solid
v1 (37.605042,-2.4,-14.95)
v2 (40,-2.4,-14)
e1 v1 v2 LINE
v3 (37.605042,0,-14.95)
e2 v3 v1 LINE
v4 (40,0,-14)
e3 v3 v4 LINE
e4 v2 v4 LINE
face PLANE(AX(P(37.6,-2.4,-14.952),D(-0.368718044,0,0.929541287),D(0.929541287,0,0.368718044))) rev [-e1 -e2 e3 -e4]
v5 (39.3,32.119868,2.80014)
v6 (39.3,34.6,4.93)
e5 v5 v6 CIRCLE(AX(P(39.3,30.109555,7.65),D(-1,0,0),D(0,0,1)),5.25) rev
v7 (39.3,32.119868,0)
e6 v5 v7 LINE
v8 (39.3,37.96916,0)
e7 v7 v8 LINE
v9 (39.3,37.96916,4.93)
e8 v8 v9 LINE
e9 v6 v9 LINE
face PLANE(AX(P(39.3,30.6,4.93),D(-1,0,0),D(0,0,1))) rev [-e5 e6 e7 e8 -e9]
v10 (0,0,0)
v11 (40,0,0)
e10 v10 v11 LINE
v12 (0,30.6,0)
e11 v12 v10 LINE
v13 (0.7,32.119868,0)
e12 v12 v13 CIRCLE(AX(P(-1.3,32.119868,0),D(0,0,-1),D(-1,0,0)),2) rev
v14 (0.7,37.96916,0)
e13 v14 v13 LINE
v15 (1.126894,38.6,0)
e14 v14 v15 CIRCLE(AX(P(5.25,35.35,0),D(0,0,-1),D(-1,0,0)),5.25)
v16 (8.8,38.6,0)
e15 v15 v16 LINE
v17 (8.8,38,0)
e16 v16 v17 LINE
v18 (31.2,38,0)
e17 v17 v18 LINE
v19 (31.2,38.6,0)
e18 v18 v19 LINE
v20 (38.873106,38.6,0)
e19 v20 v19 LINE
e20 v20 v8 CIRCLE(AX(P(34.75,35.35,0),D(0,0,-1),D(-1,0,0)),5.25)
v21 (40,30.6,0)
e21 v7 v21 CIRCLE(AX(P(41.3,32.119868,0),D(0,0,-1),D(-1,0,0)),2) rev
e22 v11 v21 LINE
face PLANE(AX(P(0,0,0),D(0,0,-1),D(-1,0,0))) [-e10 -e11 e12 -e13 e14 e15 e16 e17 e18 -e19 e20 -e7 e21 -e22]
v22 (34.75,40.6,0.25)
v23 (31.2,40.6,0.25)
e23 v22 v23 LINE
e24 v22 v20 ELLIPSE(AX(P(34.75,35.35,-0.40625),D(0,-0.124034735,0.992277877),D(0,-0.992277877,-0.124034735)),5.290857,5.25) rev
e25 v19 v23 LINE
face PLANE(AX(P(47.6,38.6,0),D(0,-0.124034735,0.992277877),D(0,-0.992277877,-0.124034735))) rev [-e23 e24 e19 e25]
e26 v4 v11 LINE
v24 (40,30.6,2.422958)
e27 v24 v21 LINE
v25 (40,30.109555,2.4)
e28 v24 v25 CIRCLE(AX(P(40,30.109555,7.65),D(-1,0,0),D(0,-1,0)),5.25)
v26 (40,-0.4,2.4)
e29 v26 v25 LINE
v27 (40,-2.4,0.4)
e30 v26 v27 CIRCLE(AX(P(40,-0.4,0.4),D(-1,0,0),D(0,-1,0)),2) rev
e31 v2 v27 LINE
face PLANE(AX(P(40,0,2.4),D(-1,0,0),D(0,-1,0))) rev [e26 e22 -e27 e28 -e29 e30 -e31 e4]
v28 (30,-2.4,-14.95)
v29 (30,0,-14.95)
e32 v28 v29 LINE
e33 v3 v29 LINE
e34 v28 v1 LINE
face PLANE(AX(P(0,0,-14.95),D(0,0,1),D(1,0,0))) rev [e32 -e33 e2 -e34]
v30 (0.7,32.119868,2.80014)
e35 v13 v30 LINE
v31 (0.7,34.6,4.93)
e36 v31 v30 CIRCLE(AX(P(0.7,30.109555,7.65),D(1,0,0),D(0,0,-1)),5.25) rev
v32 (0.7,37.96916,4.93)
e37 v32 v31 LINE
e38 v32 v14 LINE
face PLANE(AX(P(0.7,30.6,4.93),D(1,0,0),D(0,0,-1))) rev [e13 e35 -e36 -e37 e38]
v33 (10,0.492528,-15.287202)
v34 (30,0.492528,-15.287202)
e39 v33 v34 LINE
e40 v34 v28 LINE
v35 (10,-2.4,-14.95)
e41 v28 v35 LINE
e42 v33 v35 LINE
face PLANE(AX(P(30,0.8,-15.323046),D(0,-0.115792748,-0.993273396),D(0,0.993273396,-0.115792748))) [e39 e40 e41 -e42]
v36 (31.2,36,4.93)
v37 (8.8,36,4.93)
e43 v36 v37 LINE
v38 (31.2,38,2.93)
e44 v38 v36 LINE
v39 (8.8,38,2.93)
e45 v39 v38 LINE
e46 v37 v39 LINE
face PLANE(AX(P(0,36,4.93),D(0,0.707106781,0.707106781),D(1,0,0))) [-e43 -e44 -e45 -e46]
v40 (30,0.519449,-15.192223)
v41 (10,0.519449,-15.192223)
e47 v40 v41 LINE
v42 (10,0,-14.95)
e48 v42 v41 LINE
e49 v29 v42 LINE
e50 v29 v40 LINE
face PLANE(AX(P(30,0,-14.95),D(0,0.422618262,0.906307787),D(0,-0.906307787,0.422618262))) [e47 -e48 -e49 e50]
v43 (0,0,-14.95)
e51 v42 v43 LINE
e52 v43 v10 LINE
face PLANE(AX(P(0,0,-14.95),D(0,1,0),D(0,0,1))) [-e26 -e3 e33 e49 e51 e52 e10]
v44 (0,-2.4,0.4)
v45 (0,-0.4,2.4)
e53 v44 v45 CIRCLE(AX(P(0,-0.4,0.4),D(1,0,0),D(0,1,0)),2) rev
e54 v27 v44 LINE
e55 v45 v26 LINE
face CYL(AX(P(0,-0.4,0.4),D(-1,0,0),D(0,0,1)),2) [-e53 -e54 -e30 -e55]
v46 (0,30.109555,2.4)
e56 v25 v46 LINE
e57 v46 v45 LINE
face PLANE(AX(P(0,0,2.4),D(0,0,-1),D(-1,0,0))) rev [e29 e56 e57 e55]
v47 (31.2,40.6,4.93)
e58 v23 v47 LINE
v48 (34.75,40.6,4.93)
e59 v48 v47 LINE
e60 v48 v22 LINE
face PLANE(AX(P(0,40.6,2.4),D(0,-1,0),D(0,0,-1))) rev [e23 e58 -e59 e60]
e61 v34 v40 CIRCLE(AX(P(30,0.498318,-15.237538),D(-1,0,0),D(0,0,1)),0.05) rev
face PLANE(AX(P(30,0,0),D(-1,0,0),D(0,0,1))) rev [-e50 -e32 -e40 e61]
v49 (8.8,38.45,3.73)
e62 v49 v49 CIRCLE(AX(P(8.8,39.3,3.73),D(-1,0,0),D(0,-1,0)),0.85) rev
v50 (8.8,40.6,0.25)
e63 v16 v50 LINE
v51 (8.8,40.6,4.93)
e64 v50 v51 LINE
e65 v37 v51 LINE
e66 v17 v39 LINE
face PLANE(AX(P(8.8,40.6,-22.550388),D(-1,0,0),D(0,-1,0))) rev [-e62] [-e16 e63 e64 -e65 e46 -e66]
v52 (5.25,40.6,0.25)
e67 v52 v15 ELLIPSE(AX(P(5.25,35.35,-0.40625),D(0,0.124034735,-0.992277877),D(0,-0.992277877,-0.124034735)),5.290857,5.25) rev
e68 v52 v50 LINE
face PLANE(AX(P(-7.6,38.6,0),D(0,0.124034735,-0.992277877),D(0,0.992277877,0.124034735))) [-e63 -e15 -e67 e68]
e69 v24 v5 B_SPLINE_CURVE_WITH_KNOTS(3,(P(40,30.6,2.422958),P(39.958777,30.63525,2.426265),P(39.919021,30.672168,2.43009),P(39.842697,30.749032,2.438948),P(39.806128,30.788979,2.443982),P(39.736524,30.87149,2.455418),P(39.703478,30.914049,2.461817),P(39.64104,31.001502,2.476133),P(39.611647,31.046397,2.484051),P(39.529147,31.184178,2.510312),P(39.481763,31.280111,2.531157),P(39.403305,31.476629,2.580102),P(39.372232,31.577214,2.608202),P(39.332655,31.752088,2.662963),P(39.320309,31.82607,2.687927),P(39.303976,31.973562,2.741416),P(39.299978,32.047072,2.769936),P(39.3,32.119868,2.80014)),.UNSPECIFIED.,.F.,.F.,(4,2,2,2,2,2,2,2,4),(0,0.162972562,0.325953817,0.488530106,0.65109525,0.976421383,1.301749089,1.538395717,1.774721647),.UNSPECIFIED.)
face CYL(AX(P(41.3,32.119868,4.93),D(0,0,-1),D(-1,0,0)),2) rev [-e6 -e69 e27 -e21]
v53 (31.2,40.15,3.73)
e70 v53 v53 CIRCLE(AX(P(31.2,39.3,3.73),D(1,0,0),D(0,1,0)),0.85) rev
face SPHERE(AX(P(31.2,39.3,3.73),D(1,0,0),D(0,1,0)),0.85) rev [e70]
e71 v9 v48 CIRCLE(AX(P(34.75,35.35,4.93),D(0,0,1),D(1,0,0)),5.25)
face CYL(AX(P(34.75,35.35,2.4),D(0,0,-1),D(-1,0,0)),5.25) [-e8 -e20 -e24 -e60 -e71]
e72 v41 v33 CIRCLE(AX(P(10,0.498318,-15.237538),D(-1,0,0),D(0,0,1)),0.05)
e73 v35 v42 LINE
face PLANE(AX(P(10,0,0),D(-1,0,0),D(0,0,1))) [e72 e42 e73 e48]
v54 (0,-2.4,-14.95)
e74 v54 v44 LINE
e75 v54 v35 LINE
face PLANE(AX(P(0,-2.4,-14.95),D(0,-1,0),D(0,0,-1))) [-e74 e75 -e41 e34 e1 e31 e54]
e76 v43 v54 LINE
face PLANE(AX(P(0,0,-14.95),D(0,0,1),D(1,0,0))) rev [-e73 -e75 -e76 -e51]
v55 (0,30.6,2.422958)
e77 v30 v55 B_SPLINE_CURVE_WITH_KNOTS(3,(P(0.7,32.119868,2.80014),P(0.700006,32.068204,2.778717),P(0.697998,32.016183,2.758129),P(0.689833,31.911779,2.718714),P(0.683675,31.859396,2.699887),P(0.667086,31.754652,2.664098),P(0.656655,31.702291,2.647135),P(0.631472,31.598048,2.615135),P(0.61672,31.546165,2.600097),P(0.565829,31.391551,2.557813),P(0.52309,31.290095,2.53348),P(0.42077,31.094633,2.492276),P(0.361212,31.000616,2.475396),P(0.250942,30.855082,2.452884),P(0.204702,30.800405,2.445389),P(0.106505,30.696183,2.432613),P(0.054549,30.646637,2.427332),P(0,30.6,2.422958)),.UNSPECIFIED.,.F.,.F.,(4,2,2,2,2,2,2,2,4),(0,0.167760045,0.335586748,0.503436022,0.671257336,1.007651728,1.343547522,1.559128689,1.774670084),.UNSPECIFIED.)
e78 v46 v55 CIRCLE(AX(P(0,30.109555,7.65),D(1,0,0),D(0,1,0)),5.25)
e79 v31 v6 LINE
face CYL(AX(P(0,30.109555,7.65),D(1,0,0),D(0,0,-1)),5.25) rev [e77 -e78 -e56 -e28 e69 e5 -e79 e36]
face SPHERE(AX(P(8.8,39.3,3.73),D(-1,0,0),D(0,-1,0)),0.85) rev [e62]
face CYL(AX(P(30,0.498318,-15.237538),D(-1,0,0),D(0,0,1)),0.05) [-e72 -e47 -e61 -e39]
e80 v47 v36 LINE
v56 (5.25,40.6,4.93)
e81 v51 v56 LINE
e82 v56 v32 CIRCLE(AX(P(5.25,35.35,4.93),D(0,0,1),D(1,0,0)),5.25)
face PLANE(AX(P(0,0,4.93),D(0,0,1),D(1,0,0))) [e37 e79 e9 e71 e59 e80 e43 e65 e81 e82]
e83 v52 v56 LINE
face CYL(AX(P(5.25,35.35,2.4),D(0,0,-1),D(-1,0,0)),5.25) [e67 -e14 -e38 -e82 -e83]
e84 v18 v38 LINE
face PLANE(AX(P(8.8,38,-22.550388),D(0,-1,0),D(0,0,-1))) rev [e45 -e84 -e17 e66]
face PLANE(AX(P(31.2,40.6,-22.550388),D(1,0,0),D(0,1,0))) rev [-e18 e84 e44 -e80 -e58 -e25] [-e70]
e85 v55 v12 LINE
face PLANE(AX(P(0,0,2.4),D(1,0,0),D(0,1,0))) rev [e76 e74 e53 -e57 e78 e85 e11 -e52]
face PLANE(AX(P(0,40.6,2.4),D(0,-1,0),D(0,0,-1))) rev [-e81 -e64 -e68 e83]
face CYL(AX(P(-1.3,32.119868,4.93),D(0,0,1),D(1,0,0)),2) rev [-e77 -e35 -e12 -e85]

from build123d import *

# Parameters (mm, degrees)
SKETCH1_W                = 40
SKETCH1_H                = 40.6
BOSS_EXTRUDE1_DEPTH      = 2.4
SKETCH2_W                = 40
SKETCH2_H                = 2.4
BOSS_EXTRUDE2_DEPTH      = 17.35
SKETCH3_W                = 22.4
SKETCH3_H                = 2.6
CUT_EXTRUDE1_DEPTH       = 2.4
BOSS_EXTRUDE3_DEPTH      = 2.53
FILLET1_R                = 5.25
FILLET2_R                = 5.25
CUT_EXTRUDE2_DEPTH       = 16.4
FILLET3_R                = 2
CUT_EXTRUDE3_DEPTH       = 59.922512676
BOSS_EXTRUDE4_DEPTH      = 10
BOSS_EXTRUDE4_DEPTH_BACK = 10
FILLET4_R                = 0.05
CHAMFER1_SIZE            = 2
SKETCH9_W                = 0.7
SKETCH9_H                = 10
CUT_EXTRUDE4_DEPTH       = 60.009057176
FILLET5_R                = 2


with BuildPart() as part:
    # Sketch1 → Boss-Extrude1 (new body)
    with BuildSketch(Plane.XY):
        with Locations((20, 20.3)):
            Rectangle(SKETCH1_W, SKETCH1_H)
    extrude(amount=BOSS_EXTRUDE1_DEPTH)

    # Sketch2 → Boss-Extrude2 (add)
    with BuildSketch(Plane.XY.offset(2.4)):
        with Locations((20, -1.2)):
            Rectangle(SKETCH2_W, SKETCH2_H)
    extrude(amount=-BOSS_EXTRUDE2_DEPTH)

    # Sketch3 → Cut-Extrude1 (cut)
    with BuildSketch(Plane.XY.offset(2.4)):
        with Locations((20, 39.3)):
            Rectangle(SKETCH3_W, SKETCH3_H)
    extrude(amount=-CUT_EXTRUDE1_DEPTH, mode=Mode.SUBTRACT)

    # Sketch5 → Boss-Extrude3 (add)
    with BuildSketch(Plane.XY.offset(2.4)):
        Polygon((0, 40.6), (0, 34.6), (40, 34.6), (40, 40.6), (31.2, 40.6), (31.2, 38), (8.8, 38), (8.8, 40.6), align=None)
    extrude(amount=BOSS_EXTRUDE3_DEPTH)

    # Sketch4 → Cut-Revolve2 (revolve, cut)
    with BuildSketch(Plane(origin=(8.8, 0, 0), x_dir=(0, 0, -1), z_dir=(1, 0, 0))):
        with BuildLine():
            Line((-2.88, 39.3), (-4.58, 39.3))
            ThreePointArc((-4.58, 39.3), (-3.73, 38.45), (-2.88, 39.3))
        make_face()
    cut_revolve2 = revolve(axis=Axis((8.8, 39.3, 2.88), (0, 0, 1)), mode=Mode.SUBTRACT)

    # Mirror2: Cut-Revolve2 across plane
    add(cut_revolve2.mirror(Plane.ZY.offset(-20)), mode=Mode.SUBTRACT)

    # Fillet1
    fillet1_edges = [part.edges().sort_by_distance(p)[0] for p in [
        (0, 40.6, 2.465),
        (40, 40.6, 2.465),
    ]]
    fillet(fillet1_edges, radius=FILLET1_R)

    # Fillet2
    # the kernel refuses this fillet: 5.25 mm, written as the material it adds along each edge
    with BuildSketch(Plane(origin=(0, 34.6, 2.4), x_dir=(0, 0, 1), z_dir=(1, 0, 0))) as fillet2_piece_1:
        with BuildLine():
            CenterArc((5.25, 4.490445412), FILLET2_R, 180, 58.795429652)
            Line((0, 4.490445412), (-0.105, 4.490445412))
            Line((-0.105, 4.490445412), (-0.105, 0))
            Line((-0.105, 0), (0, -0.105))
            ThreePointArc((0, -0.105), (1.265, -0.105), (2.4756, -0.089808908))
            Line((2.4756, -0.089808908), (2.53, 0))
        make_face()
    extrude(amount=40)

    # Sketch6 → Cut-Extrude2 (cut)
    with BuildSketch(Plane.ZY.offset(-31.2)):
        Polygon((0, 40.6), (0, 38.6), (0.25, 40.6), align=None)
    cut_extrude2 = extrude(amount=-CUT_EXTRUDE2_DEPTH, mode=Mode.SUBTRACT)

    # Mirror3: Cut-Extrude2 across plane
    add(cut_extrude2.mirror(Plane.ZY.offset(-20)), mode=Mode.SUBTRACT)

    # Fillet3
    fillet3_edges = [part.edges().sort_by_distance(p)[0] for p in [
        (20, -2.4, 2.4),
    ]]
    fillet(fillet3_edges, radius=FILLET3_R)

    # Sketch7 → Cut-Extrude3 (cut, through all)
    with BuildSketch(Plane(origin=(0, 0, 0), x_dir=(1, 0, 0), z_dir=(0, 1, 0))):
        Polygon((37.6, 14.952), (40, 14), (40, 14.95), align=None)
    extrude(amount=-CUT_EXTRUDE3_DEPTH, mode=Mode.SUBTRACT)

    # Sketch8 → Boss-Extrude4 (add, two sides: drawn at the far end of the back side and taken through both)
    with BuildSketch(Plane.ZY.offset(-20).offset(-BOSS_EXTRUDE4_DEPTH_BACK)):
        Polygon((-14.95, 0), (-15.323046127, 0.8), (-14.95, -2.4), align=None)
    extrude(amount=BOSS_EXTRUDE4_DEPTH + BOSS_EXTRUDE4_DEPTH_BACK)

    # Fillet4
    fillet4_edges = [part.edges().sort_by_distance(p)[0] for p in [
        (20, 0.8, -15.323046127),
    ]]
    fillet(fillet4_edges, radius=FILLET4_R)

    # Chamfer1
    chamfer1_edges = [part.edges().sort_by_distance(p)[0] for p in [
        (20, 38, 4.93),
    ]]
    chamfer(chamfer1_edges, length=CHAMFER1_SIZE)

    # Sketch9 → Cut-Extrude4 (cut, through all)
    with BuildSketch(Plane(origin=(0, 0, 0), x_dir=(-1, 0, 0), z_dir=(0, 0, -1))):
        with Locations((-39.65, 35.6)):
            Rectangle(SKETCH9_W, SKETCH9_H)
        with Locations((-0.35, 35.6)):
            Rectangle(SKETCH9_W, SKETCH9_H)
    extrude(amount=-CUT_EXTRUDE4_DEPTH, mode=Mode.SUBTRACT)

    # Fillet5
    # the kernel refuses this fillet: 2 mm, written as the material it adds along each edge
    with BuildSketch(Plane(origin=(0.7, 30.6, 0), x_dir=(0, 1, 0), z_dir=(0, 0, 1))) as fillet5_piece_1_section:
        with BuildLine():
            CenterArc((1.519868415, 2), FILLET5_R, 220.541601874, 49.458398126)
            Line((0, 0.7), (-0.030397368, 0.674))
            ThreePointArc((-0.030397368, 0.674), (-0.04, 0.35), (-0.04, 0))
            Line((-0.04, 0), (0, -0.04))
            Line((0, -0.04), (1.519868415, -0.04))
            Line((1.519868415, -0.04), (1.519868415, 0))
        make_face()
    fillet5_piece_1 = extrude(amount=6.222629495, mode=Mode.PRIVATE)
    fillet5_piece_1 = fillet5_piece_1 - Plane(origin=(0.526032061, 30.109554588, 7.65), x_dir=(0, 0, 1), z_dir=(-1, 0, 0)) * Cylinder(5.25, 19, mode=Mode.PRIVATE)
    add(fillet5_piece_1)
    with BuildSketch(Plane(origin=(39.3, 30.6, 0), x_dir=(0, 1, 0), z_dir=(0, 0, 1))) as fillet5_piece_2_section:
        with BuildLine():
            CenterArc((1.519868415, -2), FILLET5_R, 90, 49.458398126)
            Line((0, -0.7), (-0.030397368, -0.674))
            ThreePointArc((-0.030397368, -0.674), (-0.04, -0.35), (-0.04, 0))
            Line((-0.04, 0), (0, 0.04))
            Line((0, 0.04), (1.519868415, 0.04))
            Line((1.519868415, 0.04), (1.519868415, 0))
        make_face()
    fillet5_piece_2 = extrude(amount=6.222629495, mode=Mode.PRIVATE)
    fillet5_piece_2 = fillet5_piece_2 - Plane(origin=(39.473967939, 30.109554588, 7.65), x_dir=(0, 0, 1), z_dir=(-1, 0, 0)) * Cylinder(5.25, 19, mode=Mode.PRIVATE)
    add(fillet5_piece_2)


solid = part.part
